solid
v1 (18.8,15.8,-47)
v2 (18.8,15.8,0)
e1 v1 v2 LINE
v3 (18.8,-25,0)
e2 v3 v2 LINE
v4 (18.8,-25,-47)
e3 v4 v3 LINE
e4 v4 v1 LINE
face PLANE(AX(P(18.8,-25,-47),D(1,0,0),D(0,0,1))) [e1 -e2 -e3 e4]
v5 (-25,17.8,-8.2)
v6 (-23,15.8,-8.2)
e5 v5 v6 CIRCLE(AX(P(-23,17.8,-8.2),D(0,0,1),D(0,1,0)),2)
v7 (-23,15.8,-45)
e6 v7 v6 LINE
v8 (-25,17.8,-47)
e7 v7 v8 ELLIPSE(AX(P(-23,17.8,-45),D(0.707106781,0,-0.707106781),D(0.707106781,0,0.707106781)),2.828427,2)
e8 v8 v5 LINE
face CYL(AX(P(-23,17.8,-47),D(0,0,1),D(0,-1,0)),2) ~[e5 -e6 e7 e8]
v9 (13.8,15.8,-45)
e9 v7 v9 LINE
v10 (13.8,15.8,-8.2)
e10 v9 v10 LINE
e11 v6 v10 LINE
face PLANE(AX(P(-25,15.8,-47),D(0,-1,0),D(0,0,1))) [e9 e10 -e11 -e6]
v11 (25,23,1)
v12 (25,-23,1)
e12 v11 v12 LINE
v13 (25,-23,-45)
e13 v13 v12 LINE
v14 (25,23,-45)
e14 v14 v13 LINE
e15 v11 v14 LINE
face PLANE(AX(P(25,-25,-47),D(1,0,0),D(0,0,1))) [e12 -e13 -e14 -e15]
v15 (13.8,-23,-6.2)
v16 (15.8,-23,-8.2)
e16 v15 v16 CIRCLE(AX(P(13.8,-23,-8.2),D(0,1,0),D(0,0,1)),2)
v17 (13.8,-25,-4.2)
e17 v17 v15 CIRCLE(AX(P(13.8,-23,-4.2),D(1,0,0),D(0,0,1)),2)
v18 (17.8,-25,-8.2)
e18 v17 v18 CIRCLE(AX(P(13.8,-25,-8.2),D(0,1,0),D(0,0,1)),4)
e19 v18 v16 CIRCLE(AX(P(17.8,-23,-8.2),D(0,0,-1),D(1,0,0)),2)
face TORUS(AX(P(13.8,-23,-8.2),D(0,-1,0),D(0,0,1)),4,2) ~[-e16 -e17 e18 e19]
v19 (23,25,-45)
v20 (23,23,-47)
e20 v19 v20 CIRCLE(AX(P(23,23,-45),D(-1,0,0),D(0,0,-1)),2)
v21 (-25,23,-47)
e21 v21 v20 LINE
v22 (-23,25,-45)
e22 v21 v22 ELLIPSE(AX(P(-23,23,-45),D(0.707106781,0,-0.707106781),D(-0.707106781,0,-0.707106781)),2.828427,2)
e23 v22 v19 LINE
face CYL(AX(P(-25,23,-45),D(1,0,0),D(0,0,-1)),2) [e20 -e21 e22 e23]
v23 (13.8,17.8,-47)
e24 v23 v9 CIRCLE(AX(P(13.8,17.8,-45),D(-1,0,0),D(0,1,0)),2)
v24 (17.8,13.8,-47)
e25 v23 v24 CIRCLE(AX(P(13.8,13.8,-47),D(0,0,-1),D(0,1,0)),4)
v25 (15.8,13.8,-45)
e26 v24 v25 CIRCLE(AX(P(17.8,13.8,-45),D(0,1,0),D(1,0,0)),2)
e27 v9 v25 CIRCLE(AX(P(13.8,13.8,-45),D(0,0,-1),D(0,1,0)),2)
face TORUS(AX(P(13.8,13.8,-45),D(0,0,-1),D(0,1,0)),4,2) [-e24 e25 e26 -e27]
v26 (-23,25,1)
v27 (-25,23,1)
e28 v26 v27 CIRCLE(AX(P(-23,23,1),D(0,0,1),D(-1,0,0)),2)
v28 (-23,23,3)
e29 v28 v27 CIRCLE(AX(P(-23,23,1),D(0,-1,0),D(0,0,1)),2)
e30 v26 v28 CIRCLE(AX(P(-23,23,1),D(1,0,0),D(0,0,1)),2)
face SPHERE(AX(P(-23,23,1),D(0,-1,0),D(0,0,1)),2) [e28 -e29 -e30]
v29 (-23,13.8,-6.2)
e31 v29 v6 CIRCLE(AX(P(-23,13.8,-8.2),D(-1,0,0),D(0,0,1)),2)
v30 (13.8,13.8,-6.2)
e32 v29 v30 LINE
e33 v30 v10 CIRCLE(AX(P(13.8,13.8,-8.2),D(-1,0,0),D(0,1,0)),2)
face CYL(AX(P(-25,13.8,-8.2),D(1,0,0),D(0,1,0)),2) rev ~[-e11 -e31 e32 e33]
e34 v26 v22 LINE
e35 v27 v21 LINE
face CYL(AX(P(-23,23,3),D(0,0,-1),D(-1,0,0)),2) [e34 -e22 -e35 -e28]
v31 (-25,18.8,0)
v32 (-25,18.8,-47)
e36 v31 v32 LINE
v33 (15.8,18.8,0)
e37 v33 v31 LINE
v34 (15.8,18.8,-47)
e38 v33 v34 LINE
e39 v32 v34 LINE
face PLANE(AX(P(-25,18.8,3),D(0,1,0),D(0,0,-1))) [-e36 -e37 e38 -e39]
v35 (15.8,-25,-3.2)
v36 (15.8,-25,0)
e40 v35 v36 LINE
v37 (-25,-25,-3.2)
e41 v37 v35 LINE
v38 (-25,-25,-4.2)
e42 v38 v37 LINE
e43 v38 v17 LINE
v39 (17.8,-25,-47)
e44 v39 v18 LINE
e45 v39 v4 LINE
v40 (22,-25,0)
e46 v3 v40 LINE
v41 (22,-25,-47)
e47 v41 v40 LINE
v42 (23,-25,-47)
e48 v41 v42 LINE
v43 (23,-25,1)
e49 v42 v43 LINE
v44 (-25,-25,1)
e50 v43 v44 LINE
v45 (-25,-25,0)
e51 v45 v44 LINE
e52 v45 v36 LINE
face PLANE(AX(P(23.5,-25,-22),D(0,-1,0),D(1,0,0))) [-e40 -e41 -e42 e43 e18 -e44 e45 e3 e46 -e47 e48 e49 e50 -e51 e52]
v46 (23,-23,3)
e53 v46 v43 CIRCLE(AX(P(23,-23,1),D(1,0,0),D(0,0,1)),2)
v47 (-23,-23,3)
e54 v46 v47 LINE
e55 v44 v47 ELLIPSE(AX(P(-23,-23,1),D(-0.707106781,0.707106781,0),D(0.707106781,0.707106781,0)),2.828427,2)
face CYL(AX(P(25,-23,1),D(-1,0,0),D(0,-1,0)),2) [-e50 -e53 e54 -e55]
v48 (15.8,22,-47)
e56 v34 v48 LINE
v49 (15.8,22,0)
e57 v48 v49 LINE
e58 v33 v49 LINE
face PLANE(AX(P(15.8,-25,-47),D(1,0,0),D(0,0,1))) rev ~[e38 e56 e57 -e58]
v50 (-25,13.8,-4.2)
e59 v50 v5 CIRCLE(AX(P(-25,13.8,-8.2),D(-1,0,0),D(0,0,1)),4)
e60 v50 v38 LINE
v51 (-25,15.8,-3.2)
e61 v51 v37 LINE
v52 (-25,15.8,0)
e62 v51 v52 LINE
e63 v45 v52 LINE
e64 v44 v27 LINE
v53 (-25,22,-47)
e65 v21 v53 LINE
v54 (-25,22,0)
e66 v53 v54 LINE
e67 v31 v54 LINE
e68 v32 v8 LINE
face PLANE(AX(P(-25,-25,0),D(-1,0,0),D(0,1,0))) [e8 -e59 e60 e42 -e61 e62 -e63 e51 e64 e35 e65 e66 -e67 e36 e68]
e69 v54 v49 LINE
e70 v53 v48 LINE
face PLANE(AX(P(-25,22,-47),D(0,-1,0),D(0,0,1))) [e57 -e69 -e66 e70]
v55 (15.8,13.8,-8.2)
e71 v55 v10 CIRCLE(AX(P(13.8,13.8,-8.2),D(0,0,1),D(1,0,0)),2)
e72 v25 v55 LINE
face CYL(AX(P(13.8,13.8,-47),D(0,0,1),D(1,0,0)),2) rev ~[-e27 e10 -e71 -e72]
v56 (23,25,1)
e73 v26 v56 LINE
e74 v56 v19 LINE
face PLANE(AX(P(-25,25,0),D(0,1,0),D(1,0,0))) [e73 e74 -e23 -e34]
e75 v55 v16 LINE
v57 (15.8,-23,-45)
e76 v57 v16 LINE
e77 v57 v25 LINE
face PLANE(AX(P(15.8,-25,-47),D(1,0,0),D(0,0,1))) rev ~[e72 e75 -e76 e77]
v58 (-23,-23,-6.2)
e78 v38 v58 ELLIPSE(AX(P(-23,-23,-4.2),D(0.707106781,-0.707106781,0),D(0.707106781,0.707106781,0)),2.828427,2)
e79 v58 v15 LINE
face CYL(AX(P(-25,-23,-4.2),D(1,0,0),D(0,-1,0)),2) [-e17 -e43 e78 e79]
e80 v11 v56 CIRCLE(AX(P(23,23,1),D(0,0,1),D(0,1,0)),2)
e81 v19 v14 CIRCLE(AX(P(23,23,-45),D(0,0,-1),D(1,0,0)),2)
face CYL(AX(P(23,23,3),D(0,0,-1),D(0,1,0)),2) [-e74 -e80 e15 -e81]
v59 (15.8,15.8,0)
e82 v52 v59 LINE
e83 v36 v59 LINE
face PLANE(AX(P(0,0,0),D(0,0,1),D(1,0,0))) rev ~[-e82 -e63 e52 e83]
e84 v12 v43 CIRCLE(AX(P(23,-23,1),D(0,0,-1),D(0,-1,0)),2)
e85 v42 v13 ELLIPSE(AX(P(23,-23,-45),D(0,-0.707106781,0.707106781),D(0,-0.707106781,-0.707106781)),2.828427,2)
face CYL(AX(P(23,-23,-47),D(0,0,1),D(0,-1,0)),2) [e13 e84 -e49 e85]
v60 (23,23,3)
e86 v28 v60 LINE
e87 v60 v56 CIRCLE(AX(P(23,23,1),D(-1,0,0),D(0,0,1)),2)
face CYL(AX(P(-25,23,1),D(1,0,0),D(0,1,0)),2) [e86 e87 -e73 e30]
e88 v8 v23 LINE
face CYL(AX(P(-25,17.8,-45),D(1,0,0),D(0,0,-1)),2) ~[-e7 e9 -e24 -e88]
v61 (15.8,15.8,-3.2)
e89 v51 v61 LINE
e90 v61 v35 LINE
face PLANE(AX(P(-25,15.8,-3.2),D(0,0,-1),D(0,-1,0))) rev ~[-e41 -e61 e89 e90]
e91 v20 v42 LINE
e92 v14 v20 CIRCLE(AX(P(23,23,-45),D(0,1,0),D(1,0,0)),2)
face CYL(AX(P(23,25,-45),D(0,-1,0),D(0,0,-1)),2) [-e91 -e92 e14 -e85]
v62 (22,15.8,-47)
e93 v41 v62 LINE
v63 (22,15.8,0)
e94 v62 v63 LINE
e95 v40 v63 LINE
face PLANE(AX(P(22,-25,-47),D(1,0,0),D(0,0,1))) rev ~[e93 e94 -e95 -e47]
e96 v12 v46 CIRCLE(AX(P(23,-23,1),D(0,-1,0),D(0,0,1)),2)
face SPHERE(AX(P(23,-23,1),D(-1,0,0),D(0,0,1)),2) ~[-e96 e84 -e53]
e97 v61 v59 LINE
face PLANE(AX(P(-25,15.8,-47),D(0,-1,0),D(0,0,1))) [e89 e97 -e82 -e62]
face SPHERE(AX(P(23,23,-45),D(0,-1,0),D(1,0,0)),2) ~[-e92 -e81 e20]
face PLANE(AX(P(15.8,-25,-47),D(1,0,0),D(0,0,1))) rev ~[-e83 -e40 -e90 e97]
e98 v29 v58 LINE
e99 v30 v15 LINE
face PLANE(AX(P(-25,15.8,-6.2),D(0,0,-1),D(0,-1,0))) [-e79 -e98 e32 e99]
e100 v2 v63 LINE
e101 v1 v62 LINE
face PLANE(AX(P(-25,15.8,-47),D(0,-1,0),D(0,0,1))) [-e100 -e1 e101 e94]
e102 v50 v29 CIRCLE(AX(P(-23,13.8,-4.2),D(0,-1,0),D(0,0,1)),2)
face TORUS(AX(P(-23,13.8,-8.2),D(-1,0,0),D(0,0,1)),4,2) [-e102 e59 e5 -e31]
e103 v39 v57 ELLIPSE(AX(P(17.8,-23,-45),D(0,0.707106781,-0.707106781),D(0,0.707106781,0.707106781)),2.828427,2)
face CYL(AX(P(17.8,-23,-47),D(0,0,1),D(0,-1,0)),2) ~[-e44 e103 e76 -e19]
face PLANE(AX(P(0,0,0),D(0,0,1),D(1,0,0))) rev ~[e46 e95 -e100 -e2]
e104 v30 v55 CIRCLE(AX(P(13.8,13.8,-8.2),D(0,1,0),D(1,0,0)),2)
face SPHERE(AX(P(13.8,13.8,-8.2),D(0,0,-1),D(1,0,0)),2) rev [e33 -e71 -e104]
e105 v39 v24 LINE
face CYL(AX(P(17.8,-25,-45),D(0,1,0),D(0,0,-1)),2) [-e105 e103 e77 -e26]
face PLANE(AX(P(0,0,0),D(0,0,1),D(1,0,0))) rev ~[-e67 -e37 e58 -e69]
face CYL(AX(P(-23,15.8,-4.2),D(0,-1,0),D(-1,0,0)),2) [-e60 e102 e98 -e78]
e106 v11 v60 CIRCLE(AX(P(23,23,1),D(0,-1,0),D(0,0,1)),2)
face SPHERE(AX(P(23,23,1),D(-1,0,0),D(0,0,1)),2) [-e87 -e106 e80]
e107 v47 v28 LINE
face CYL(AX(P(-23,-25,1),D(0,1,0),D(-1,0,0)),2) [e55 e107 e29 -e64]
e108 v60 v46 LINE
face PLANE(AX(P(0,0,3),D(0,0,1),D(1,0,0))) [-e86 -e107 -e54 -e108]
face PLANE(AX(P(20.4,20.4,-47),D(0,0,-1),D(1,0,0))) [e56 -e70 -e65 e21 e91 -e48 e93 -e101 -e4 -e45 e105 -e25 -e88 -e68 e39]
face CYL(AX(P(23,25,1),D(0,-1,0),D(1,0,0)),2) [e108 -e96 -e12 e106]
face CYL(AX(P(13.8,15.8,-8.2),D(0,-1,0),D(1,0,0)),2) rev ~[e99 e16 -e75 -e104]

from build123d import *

# Parameters (mm, degrees)
F0_W      = 50
F0_H      = 50
F1_DEPTH  = 3
F2_W      = 3
F2_H      = 3
F2_H_2    = 47
F3_DEPTH  = 50
F4_W      = 3
F4_H      = 50
F5_DEPTH  = 47
F6_DEPTH  = 3
F7_W      = 3.2
F7_H      = 3.2
F8_DEPTH  = 50
F9_W      = 40.8
F9_H      = 3
F10_DEPTH = 40.8
F11_R     = 2


with BuildPart() as f1:
    # F0 (on Top) → F1 (new body)
    with BuildSketch(Plane.XY):
        Rectangle(F0_W, F0_H)
    extrude(amount=F1_DEPTH)

    # F2 (on face) → F3 (join, through all)
    with BuildSketch(Plane(origin=(-25, 0, 0), x_dir=(0, -1, 0), z_dir=(-1, 0, 0))):
        with Locations((-23.5, 1.5)):
            Rectangle(F2_W, F2_H)
        with Locations((-17.3, 1.5)):
            Rectangle(F2_W, F2_H)
        with Locations((-17.3, -23.5)):
            Rectangle(F2_W, F2_H_2)
        with Locations((-23.5, -23.5)):
            Rectangle(F2_W, F2_H_2)
    extrude(amount=-F3_DEPTH)

    # F4 (on face) → F5 (join, through all)
    with BuildSketch(Plane.XZ.offset(25)):
        with Locations((23.5, -22)):
            Rectangle(F4_W, F4_H)
        with Locations((17.3, -22)):
            Rectangle(F4_W, F4_H)
    extrude(amount=-F5_DEPTH)

    # F6 (add, through all): a face of the model
    f6_faces = [f1.faces().sort_by_distance(p)[0] for p in [
        (20.4, 20.4, 0),
    ]]
    extrude(f6_faces, amount=-F6_DEPTH)

    # F7 (on face) → F8 (join, through all)
    with BuildSketch(Plane(origin=(0, 0, -47), x_dir=(1, 0, 0), z_dir=(0, 0, -1))):
        with Locations((20.4, -20.4)):
            Rectangle(F7_W, F7_H)
    extrude(amount=-F8_DEPTH)

    # F9 (on face) → F10 (join, through all)
    with BuildSketch(Plane(origin=(-25, 0, 0), x_dir=(0, -1, 0), z_dir=(-1, 0, 0))):
        with Locations((4.6, -4.7)):
            Rectangle(F9_W, F9_H)
    extrude(amount=-F10_DEPTH)

    # F11
    f11_edges = [f1.edges().sort_by_distance(p)[0] for p in [
        (-25, 0, 3),
        (0, -25, 3),
        (0, 25, 3),
        (25, 0, 3),
        (25, 0, -47),
        (25, -25, -22),
        (25, 25, -22),
        (-25, 25, -22),
        (0, 25, -47),
        (15.8, -25, -26.6),
        (15.8, -4.6, -47),
        (15.8, 15.8, -26.6),
        (15.8, -4.6, -6.2),
        (-25, 15.8, -26.6),
        (-4.6, 15.8, -6.2),
        (-4.6, 15.8, -47),
        (-4.6, -25, -6.2),
        (-25, -4.6, -6.2),
    ]]
    fillet(f11_edges, radius=F11_R)


solid = f1.part
